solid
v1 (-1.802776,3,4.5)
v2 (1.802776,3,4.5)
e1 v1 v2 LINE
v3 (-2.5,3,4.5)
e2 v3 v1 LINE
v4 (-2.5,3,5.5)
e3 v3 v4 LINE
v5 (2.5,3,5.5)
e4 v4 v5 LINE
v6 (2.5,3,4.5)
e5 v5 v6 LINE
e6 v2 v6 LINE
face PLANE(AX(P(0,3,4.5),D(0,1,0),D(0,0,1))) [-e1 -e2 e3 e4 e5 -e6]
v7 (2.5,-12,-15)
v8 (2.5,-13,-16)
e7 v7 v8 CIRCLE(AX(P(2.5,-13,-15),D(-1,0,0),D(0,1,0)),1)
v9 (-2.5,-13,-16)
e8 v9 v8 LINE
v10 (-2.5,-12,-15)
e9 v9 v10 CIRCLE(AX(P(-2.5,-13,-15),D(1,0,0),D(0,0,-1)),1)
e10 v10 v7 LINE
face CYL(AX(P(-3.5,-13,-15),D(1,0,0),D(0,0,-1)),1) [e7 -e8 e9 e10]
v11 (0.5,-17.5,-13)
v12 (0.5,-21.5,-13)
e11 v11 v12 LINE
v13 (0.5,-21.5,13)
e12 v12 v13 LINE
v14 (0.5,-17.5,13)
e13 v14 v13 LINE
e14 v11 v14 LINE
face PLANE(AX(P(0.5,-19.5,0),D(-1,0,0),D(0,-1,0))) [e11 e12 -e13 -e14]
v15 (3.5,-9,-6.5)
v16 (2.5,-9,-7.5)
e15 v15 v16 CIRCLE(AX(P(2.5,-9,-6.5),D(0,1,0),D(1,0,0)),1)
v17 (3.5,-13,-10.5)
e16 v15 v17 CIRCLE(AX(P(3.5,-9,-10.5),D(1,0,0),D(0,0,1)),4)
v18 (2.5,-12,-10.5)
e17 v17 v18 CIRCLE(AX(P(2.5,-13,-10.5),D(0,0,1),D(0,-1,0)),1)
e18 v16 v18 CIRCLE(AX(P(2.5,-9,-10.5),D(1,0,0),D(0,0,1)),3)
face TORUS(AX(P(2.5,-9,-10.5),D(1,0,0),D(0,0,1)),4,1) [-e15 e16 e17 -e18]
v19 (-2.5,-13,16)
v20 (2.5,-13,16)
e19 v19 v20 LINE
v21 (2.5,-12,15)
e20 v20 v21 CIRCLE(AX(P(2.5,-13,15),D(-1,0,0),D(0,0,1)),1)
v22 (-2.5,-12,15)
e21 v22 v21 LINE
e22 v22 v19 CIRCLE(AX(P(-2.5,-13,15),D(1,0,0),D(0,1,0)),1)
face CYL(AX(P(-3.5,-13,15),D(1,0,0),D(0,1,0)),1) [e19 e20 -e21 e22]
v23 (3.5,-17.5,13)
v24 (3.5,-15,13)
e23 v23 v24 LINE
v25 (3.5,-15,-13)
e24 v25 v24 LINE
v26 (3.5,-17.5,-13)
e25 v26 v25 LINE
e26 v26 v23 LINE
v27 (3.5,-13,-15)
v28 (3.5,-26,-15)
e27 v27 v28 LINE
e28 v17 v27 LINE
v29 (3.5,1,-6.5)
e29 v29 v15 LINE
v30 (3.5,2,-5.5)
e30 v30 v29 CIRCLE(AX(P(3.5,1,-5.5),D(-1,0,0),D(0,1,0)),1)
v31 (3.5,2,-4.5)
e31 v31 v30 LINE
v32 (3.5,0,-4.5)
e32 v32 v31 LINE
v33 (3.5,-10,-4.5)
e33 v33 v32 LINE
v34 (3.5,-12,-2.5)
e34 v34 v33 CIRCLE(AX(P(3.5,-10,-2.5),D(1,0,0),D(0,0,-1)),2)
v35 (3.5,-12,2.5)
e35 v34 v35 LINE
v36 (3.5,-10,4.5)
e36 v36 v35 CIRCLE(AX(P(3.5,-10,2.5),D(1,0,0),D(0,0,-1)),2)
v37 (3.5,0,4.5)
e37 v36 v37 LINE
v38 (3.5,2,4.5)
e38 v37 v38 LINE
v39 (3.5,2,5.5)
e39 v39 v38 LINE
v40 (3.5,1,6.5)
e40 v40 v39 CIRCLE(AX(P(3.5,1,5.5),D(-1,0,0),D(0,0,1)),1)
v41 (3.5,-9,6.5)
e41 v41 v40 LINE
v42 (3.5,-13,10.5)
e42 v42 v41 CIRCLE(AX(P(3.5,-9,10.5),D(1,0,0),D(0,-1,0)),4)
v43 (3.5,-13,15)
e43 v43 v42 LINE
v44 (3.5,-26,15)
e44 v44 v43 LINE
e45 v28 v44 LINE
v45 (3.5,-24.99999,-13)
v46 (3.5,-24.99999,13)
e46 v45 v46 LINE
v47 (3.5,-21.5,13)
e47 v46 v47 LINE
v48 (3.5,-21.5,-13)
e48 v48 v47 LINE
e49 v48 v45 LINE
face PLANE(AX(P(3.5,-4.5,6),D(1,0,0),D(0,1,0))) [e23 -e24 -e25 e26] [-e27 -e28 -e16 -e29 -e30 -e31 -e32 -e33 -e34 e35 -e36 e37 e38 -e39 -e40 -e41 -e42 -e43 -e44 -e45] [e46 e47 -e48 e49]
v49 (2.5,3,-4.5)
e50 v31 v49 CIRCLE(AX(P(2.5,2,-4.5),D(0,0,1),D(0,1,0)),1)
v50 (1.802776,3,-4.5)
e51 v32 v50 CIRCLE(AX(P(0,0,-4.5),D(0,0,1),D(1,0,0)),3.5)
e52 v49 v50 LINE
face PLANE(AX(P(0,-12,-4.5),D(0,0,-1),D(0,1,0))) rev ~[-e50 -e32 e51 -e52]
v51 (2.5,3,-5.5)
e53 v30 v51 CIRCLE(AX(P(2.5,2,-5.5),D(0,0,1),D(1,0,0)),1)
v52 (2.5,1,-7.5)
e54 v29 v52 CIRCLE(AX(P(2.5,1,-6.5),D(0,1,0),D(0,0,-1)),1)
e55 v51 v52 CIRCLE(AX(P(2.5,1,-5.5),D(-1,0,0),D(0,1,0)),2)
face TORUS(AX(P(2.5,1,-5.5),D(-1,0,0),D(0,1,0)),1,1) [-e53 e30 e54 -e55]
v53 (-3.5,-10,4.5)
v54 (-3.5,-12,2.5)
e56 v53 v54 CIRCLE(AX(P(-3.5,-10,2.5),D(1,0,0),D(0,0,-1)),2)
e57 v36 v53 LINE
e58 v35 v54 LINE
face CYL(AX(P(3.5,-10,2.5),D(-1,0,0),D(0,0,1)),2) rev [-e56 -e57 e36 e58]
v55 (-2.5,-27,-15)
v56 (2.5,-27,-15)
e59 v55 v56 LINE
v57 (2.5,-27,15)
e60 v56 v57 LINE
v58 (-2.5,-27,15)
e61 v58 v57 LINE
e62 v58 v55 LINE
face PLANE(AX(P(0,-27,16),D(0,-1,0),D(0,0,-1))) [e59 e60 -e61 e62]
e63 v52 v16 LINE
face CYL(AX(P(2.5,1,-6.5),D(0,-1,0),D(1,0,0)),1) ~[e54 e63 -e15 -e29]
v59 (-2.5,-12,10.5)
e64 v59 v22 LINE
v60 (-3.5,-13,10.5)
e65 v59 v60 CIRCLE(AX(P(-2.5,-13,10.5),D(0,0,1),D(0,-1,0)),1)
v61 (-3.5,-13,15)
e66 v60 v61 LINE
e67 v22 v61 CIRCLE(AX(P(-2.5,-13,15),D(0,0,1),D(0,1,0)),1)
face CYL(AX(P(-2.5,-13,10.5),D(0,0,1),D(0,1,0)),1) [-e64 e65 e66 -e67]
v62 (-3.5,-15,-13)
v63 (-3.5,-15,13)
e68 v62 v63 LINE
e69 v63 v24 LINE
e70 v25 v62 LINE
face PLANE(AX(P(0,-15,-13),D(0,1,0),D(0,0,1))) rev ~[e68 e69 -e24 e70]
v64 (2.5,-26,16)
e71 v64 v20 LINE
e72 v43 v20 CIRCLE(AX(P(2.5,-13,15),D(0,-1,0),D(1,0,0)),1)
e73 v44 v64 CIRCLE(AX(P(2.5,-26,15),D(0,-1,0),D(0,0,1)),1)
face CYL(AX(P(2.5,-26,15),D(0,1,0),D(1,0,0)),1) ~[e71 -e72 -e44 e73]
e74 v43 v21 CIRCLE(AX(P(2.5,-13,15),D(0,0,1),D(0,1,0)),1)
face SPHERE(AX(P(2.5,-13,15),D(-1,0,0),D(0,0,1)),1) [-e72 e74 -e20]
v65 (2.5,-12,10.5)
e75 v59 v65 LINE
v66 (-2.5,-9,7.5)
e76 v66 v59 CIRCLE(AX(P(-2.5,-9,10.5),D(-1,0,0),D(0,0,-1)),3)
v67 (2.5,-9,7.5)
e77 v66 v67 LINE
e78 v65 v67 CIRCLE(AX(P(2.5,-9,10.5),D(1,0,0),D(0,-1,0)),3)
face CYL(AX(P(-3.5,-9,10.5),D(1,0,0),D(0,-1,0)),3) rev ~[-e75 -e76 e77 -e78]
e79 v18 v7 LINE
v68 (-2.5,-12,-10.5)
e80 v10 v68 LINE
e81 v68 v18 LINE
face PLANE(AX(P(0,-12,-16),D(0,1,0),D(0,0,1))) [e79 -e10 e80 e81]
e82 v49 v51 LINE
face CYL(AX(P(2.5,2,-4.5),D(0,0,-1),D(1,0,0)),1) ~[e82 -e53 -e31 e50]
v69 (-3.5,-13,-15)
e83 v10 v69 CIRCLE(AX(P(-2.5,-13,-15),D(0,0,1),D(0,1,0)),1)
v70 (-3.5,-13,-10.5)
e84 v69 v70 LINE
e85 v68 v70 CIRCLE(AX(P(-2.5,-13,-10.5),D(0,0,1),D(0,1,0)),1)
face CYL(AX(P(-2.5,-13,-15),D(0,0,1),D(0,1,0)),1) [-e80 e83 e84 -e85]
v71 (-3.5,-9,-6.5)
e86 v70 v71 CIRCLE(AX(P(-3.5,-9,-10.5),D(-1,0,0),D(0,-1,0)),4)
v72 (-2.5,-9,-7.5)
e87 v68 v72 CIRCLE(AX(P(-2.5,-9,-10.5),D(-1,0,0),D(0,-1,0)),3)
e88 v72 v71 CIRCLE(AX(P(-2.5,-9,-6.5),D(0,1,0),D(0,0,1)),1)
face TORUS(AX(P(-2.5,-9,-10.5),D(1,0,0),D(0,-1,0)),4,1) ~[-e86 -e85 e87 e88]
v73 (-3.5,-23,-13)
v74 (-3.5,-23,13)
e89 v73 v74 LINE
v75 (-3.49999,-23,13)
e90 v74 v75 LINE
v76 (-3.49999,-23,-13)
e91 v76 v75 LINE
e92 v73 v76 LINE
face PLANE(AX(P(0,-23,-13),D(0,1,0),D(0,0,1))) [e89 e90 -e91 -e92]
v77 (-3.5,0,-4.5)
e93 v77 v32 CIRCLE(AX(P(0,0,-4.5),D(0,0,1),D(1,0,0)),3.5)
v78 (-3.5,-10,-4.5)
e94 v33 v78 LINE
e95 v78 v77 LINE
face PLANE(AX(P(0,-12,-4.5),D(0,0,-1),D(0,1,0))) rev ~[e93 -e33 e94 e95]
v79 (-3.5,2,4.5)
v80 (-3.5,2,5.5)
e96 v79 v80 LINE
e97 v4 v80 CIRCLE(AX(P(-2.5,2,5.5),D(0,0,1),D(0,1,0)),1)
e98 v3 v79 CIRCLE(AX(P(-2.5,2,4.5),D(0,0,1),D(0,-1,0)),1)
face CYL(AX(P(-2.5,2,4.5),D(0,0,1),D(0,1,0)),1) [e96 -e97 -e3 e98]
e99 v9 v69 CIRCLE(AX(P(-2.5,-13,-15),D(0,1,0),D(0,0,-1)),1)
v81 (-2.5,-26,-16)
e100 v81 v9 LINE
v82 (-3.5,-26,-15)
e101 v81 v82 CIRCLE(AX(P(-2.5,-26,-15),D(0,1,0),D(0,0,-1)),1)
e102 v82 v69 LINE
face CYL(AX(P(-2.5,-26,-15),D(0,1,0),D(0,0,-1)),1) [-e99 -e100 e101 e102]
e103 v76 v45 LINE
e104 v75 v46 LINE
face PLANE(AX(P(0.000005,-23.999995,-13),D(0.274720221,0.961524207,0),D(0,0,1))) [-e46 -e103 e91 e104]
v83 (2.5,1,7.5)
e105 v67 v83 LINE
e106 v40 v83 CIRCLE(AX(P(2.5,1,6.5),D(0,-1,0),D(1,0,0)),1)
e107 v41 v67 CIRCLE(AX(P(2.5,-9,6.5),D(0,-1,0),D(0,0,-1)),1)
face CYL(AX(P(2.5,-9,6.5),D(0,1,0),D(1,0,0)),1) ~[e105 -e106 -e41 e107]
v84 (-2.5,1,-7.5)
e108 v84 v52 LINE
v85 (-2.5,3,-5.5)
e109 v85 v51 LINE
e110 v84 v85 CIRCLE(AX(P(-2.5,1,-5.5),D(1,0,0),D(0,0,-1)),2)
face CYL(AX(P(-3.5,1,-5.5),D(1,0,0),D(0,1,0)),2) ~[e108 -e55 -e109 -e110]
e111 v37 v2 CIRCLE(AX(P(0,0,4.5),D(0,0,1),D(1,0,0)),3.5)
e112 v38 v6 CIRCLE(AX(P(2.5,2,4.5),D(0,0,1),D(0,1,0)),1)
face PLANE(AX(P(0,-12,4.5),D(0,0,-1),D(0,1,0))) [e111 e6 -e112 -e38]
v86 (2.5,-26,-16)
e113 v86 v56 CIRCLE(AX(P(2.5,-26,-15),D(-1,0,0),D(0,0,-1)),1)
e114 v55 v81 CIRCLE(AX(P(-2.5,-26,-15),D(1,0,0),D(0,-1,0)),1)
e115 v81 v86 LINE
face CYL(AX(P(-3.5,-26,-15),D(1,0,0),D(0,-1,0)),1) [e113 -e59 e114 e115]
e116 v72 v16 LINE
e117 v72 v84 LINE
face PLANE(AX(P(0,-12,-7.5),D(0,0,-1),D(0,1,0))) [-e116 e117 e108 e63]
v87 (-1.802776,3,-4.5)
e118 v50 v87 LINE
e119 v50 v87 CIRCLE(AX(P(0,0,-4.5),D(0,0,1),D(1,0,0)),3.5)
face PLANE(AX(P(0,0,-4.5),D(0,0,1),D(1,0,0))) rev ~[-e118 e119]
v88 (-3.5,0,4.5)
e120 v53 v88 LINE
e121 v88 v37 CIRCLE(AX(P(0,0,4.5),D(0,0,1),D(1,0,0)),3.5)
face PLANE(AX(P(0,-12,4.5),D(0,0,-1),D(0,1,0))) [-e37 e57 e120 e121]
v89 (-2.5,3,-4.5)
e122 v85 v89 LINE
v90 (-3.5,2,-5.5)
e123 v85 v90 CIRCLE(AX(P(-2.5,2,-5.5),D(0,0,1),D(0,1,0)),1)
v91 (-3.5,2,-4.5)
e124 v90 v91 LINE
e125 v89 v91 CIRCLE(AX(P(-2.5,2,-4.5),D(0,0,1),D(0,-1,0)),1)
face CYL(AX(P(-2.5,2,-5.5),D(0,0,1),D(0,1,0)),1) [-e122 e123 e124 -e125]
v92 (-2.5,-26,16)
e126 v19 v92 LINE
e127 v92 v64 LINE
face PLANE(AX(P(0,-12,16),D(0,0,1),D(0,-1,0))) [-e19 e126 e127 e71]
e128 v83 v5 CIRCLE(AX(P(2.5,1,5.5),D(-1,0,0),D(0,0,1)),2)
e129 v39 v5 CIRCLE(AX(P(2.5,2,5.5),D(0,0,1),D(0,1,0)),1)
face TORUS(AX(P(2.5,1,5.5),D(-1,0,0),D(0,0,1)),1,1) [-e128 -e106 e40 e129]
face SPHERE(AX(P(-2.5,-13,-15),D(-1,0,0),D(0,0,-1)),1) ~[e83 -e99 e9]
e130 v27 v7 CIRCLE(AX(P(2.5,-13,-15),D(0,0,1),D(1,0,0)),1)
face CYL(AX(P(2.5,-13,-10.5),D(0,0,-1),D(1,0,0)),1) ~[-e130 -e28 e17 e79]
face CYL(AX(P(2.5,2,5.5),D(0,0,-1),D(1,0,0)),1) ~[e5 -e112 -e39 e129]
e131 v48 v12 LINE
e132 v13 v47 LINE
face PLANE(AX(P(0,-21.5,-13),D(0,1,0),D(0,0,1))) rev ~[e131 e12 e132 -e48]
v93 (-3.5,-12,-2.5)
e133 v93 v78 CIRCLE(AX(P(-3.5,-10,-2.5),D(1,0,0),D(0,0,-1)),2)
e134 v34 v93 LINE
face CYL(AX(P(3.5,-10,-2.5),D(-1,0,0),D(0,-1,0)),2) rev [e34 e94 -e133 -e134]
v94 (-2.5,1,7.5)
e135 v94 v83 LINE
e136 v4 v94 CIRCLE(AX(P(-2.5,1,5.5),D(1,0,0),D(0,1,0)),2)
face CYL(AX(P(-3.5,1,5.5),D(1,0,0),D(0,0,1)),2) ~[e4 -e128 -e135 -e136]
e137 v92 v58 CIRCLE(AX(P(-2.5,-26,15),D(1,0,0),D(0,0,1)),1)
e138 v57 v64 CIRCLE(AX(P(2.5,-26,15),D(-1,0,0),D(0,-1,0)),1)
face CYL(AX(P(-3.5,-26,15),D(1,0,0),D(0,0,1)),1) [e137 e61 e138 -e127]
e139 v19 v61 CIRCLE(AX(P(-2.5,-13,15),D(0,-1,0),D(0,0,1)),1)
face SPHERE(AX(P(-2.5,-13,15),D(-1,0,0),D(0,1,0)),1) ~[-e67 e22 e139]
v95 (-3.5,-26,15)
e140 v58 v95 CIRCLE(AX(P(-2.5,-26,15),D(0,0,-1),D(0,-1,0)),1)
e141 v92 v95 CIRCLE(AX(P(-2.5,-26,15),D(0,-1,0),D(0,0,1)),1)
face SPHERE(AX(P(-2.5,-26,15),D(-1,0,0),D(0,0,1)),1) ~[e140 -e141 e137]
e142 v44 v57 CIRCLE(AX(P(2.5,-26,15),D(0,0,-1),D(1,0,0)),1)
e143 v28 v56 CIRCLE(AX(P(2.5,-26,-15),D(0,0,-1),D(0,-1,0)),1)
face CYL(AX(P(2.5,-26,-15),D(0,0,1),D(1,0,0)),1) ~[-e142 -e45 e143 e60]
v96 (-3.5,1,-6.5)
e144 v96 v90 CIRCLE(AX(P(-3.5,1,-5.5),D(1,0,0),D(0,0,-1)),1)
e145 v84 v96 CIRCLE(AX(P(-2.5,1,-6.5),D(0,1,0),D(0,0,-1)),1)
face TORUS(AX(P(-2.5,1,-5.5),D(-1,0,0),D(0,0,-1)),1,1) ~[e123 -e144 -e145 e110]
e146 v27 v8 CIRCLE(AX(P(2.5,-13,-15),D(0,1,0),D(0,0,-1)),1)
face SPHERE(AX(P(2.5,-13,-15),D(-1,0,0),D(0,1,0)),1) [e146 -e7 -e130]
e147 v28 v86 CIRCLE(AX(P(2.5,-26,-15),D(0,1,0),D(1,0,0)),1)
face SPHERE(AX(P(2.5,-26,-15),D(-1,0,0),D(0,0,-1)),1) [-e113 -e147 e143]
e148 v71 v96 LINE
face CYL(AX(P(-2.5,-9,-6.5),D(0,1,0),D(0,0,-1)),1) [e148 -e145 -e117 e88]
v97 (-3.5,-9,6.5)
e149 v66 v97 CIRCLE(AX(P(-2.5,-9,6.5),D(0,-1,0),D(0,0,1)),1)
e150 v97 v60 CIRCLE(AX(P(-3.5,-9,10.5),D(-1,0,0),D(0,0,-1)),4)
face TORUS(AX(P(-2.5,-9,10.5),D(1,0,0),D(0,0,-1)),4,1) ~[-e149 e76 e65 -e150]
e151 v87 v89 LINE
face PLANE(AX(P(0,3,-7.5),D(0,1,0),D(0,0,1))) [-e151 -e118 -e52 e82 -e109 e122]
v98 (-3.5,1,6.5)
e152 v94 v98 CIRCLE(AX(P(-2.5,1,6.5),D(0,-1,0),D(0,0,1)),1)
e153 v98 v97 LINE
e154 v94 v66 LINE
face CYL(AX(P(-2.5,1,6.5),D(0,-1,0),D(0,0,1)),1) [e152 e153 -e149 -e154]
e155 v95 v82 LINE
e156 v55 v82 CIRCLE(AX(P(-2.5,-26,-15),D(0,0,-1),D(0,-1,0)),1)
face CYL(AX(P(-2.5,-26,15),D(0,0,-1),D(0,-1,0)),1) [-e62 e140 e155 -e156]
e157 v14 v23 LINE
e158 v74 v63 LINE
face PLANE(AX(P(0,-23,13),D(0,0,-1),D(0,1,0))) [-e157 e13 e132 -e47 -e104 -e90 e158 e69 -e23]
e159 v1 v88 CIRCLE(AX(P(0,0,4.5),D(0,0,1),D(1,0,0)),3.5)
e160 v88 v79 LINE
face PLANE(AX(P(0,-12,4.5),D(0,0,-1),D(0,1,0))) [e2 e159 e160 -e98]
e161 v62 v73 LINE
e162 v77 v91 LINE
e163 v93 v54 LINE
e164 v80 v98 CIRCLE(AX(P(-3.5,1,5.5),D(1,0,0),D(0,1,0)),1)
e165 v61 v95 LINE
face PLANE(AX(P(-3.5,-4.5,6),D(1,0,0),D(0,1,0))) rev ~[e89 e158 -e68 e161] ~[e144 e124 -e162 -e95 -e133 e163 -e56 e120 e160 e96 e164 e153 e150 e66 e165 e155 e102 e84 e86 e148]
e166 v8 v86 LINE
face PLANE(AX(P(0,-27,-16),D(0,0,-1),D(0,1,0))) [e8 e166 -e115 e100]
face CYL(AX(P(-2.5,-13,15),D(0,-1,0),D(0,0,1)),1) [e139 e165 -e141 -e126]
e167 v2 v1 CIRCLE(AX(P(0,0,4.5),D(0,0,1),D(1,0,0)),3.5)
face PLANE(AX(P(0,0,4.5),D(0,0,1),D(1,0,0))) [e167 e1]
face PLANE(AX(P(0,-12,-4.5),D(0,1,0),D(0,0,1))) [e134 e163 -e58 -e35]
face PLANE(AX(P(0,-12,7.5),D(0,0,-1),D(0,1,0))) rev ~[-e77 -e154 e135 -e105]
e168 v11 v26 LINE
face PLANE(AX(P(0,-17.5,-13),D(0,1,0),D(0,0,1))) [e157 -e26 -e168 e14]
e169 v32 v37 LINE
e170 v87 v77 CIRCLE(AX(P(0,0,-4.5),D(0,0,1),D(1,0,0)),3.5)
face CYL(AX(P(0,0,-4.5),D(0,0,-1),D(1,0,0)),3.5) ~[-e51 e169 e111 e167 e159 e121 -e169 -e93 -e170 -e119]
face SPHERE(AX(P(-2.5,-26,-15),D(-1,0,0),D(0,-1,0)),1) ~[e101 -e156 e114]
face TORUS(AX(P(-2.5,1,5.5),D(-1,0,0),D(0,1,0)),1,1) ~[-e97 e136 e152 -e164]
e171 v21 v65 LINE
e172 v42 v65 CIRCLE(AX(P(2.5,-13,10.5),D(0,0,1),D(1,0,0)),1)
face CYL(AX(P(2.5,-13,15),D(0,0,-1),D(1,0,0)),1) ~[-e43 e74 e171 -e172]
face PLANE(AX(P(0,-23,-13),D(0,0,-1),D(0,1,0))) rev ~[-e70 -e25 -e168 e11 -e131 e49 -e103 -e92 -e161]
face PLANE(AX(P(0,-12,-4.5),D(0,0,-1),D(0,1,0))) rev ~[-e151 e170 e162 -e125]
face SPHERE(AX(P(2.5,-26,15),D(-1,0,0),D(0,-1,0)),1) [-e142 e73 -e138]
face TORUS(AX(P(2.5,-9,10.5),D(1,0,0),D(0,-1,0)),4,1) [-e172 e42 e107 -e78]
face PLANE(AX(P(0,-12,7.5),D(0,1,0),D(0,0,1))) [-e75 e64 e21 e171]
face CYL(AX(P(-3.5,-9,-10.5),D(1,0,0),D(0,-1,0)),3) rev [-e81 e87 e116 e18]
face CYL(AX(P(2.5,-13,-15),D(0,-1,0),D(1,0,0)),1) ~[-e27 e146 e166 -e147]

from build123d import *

# Parameters (mm, degrees)
F0_W      = 15
F0_H      = 3
F0_W_2    = 1.5
F0_H_2    = 26
F0_W_3    = 2.5
F1_DEPTH  = 3.5
F2_R      = 3.5
F3_DEPTH  = 9
F4_R      = 1
F5_R      = 3
F6_R      = 2
F7_R      = 1
F8_SIZE2  = 1.99999
F8_SIZE   = 6.99999
F9_W      = 4
F9_H      = 26
F10_DEPTH = 4


# Not quite as in the source:
# - a fillet or chamfer is up to 0.001 mm smaller than in the source, because OpenCascade refuses the exact size


with BuildPart() as f1:
    # F0 (on Right) → F1 (new body, symmetric)
    with BuildSketch(Plane.YZ):
        with Locations((-4.5, 6)):
            Rectangle(F0_W, F0_H)
        Polygon((-12, -4.5), (-12, 4.5), (-12, 7.5), (-12, 16), (-27, 16), (-27, -16), (-12, -16), (-12, -7.5), align=None)
        with Locations((-22.25, 0)):
            Rectangle(F0_W_2, F0_H_2, mode=Mode.SUBTRACT)
        with Locations((-16.25, 0)):
            Rectangle(F0_W_3, F0_H_2, mode=Mode.SUBTRACT)
        with Locations((-4.5, -6)):
            Rectangle(F0_W, F0_H)
    extrude(amount=F1_DEPTH, both=True)

    # F2 (on face) → F3 (join, through all)
    with BuildSketch(Plane.XY.offset(-4.5)):
        Circle(F2_R)
    extrude(amount=F3_DEPTH)

    # F4
    f4_edges = [f1.edges().sort_by_distance(p)[0] for p in [
        (0, -27, 16),
        (0, -12, 16),
        (0, -27, -16),
        (0, -12, -16),
    ]]
    fillet(f4_edges, radius=F4_R)

    # F5
    f5_edges = [f1.edges().sort_by_distance(p)[0] for p in [
        (0, -12, 7.5),
        (0, -12, -7.5),
    ]]
    fillet(f5_edges, radius=F5_R)

    # F6
    f6_edges = [f1.edges().sort_by_distance(p)[0] for p in [
        (0, 3, 7.5),
        (0, 3, -7.5),
        (0, -12, -4.5),
        (0, -12, 4.5),
    ]]
    fillet(f6_edges, radius=F6_R)

    # F7
    f7_edges = [f1.edges().sort_by_distance(p)[0] for p in [
        (-3.5, -4, -7.5),
        (-3.5, -4, 7.5),
        (3.5, 2.414214, 6.914214),
        (3.5, 2.414214, -6.914214),
    ]]
    fillet(f7_edges, radius=F7_R)

    # F8 (size 7 and 2 in the source; OpenCascade refuses exactly that, so slightly less here)
    f8_edges = [f1.edges().sort_by_distance(p)[0] for p in [
        (3.5, -23, 0),
    ]]
    f8_side = f1.faces().sort_by_distance((0, -23, 0))[0]
    chamfer(f8_edges, length=F8_SIZE, length2=F8_SIZE2, reference=f8_side)

    # F9 (on face) → F10 (cut)
    with BuildSketch(Plane(origin=(-3.5, 0, 0), x_dir=(0, -1, 0), z_dir=(-1, 0, 0))):
        with Locations((19.5, 0)):
            Rectangle(F9_W, F9_H)
    extrude(amount=-F10_DEPTH, mode=Mode.SUBTRACT)


solid = f1.part
